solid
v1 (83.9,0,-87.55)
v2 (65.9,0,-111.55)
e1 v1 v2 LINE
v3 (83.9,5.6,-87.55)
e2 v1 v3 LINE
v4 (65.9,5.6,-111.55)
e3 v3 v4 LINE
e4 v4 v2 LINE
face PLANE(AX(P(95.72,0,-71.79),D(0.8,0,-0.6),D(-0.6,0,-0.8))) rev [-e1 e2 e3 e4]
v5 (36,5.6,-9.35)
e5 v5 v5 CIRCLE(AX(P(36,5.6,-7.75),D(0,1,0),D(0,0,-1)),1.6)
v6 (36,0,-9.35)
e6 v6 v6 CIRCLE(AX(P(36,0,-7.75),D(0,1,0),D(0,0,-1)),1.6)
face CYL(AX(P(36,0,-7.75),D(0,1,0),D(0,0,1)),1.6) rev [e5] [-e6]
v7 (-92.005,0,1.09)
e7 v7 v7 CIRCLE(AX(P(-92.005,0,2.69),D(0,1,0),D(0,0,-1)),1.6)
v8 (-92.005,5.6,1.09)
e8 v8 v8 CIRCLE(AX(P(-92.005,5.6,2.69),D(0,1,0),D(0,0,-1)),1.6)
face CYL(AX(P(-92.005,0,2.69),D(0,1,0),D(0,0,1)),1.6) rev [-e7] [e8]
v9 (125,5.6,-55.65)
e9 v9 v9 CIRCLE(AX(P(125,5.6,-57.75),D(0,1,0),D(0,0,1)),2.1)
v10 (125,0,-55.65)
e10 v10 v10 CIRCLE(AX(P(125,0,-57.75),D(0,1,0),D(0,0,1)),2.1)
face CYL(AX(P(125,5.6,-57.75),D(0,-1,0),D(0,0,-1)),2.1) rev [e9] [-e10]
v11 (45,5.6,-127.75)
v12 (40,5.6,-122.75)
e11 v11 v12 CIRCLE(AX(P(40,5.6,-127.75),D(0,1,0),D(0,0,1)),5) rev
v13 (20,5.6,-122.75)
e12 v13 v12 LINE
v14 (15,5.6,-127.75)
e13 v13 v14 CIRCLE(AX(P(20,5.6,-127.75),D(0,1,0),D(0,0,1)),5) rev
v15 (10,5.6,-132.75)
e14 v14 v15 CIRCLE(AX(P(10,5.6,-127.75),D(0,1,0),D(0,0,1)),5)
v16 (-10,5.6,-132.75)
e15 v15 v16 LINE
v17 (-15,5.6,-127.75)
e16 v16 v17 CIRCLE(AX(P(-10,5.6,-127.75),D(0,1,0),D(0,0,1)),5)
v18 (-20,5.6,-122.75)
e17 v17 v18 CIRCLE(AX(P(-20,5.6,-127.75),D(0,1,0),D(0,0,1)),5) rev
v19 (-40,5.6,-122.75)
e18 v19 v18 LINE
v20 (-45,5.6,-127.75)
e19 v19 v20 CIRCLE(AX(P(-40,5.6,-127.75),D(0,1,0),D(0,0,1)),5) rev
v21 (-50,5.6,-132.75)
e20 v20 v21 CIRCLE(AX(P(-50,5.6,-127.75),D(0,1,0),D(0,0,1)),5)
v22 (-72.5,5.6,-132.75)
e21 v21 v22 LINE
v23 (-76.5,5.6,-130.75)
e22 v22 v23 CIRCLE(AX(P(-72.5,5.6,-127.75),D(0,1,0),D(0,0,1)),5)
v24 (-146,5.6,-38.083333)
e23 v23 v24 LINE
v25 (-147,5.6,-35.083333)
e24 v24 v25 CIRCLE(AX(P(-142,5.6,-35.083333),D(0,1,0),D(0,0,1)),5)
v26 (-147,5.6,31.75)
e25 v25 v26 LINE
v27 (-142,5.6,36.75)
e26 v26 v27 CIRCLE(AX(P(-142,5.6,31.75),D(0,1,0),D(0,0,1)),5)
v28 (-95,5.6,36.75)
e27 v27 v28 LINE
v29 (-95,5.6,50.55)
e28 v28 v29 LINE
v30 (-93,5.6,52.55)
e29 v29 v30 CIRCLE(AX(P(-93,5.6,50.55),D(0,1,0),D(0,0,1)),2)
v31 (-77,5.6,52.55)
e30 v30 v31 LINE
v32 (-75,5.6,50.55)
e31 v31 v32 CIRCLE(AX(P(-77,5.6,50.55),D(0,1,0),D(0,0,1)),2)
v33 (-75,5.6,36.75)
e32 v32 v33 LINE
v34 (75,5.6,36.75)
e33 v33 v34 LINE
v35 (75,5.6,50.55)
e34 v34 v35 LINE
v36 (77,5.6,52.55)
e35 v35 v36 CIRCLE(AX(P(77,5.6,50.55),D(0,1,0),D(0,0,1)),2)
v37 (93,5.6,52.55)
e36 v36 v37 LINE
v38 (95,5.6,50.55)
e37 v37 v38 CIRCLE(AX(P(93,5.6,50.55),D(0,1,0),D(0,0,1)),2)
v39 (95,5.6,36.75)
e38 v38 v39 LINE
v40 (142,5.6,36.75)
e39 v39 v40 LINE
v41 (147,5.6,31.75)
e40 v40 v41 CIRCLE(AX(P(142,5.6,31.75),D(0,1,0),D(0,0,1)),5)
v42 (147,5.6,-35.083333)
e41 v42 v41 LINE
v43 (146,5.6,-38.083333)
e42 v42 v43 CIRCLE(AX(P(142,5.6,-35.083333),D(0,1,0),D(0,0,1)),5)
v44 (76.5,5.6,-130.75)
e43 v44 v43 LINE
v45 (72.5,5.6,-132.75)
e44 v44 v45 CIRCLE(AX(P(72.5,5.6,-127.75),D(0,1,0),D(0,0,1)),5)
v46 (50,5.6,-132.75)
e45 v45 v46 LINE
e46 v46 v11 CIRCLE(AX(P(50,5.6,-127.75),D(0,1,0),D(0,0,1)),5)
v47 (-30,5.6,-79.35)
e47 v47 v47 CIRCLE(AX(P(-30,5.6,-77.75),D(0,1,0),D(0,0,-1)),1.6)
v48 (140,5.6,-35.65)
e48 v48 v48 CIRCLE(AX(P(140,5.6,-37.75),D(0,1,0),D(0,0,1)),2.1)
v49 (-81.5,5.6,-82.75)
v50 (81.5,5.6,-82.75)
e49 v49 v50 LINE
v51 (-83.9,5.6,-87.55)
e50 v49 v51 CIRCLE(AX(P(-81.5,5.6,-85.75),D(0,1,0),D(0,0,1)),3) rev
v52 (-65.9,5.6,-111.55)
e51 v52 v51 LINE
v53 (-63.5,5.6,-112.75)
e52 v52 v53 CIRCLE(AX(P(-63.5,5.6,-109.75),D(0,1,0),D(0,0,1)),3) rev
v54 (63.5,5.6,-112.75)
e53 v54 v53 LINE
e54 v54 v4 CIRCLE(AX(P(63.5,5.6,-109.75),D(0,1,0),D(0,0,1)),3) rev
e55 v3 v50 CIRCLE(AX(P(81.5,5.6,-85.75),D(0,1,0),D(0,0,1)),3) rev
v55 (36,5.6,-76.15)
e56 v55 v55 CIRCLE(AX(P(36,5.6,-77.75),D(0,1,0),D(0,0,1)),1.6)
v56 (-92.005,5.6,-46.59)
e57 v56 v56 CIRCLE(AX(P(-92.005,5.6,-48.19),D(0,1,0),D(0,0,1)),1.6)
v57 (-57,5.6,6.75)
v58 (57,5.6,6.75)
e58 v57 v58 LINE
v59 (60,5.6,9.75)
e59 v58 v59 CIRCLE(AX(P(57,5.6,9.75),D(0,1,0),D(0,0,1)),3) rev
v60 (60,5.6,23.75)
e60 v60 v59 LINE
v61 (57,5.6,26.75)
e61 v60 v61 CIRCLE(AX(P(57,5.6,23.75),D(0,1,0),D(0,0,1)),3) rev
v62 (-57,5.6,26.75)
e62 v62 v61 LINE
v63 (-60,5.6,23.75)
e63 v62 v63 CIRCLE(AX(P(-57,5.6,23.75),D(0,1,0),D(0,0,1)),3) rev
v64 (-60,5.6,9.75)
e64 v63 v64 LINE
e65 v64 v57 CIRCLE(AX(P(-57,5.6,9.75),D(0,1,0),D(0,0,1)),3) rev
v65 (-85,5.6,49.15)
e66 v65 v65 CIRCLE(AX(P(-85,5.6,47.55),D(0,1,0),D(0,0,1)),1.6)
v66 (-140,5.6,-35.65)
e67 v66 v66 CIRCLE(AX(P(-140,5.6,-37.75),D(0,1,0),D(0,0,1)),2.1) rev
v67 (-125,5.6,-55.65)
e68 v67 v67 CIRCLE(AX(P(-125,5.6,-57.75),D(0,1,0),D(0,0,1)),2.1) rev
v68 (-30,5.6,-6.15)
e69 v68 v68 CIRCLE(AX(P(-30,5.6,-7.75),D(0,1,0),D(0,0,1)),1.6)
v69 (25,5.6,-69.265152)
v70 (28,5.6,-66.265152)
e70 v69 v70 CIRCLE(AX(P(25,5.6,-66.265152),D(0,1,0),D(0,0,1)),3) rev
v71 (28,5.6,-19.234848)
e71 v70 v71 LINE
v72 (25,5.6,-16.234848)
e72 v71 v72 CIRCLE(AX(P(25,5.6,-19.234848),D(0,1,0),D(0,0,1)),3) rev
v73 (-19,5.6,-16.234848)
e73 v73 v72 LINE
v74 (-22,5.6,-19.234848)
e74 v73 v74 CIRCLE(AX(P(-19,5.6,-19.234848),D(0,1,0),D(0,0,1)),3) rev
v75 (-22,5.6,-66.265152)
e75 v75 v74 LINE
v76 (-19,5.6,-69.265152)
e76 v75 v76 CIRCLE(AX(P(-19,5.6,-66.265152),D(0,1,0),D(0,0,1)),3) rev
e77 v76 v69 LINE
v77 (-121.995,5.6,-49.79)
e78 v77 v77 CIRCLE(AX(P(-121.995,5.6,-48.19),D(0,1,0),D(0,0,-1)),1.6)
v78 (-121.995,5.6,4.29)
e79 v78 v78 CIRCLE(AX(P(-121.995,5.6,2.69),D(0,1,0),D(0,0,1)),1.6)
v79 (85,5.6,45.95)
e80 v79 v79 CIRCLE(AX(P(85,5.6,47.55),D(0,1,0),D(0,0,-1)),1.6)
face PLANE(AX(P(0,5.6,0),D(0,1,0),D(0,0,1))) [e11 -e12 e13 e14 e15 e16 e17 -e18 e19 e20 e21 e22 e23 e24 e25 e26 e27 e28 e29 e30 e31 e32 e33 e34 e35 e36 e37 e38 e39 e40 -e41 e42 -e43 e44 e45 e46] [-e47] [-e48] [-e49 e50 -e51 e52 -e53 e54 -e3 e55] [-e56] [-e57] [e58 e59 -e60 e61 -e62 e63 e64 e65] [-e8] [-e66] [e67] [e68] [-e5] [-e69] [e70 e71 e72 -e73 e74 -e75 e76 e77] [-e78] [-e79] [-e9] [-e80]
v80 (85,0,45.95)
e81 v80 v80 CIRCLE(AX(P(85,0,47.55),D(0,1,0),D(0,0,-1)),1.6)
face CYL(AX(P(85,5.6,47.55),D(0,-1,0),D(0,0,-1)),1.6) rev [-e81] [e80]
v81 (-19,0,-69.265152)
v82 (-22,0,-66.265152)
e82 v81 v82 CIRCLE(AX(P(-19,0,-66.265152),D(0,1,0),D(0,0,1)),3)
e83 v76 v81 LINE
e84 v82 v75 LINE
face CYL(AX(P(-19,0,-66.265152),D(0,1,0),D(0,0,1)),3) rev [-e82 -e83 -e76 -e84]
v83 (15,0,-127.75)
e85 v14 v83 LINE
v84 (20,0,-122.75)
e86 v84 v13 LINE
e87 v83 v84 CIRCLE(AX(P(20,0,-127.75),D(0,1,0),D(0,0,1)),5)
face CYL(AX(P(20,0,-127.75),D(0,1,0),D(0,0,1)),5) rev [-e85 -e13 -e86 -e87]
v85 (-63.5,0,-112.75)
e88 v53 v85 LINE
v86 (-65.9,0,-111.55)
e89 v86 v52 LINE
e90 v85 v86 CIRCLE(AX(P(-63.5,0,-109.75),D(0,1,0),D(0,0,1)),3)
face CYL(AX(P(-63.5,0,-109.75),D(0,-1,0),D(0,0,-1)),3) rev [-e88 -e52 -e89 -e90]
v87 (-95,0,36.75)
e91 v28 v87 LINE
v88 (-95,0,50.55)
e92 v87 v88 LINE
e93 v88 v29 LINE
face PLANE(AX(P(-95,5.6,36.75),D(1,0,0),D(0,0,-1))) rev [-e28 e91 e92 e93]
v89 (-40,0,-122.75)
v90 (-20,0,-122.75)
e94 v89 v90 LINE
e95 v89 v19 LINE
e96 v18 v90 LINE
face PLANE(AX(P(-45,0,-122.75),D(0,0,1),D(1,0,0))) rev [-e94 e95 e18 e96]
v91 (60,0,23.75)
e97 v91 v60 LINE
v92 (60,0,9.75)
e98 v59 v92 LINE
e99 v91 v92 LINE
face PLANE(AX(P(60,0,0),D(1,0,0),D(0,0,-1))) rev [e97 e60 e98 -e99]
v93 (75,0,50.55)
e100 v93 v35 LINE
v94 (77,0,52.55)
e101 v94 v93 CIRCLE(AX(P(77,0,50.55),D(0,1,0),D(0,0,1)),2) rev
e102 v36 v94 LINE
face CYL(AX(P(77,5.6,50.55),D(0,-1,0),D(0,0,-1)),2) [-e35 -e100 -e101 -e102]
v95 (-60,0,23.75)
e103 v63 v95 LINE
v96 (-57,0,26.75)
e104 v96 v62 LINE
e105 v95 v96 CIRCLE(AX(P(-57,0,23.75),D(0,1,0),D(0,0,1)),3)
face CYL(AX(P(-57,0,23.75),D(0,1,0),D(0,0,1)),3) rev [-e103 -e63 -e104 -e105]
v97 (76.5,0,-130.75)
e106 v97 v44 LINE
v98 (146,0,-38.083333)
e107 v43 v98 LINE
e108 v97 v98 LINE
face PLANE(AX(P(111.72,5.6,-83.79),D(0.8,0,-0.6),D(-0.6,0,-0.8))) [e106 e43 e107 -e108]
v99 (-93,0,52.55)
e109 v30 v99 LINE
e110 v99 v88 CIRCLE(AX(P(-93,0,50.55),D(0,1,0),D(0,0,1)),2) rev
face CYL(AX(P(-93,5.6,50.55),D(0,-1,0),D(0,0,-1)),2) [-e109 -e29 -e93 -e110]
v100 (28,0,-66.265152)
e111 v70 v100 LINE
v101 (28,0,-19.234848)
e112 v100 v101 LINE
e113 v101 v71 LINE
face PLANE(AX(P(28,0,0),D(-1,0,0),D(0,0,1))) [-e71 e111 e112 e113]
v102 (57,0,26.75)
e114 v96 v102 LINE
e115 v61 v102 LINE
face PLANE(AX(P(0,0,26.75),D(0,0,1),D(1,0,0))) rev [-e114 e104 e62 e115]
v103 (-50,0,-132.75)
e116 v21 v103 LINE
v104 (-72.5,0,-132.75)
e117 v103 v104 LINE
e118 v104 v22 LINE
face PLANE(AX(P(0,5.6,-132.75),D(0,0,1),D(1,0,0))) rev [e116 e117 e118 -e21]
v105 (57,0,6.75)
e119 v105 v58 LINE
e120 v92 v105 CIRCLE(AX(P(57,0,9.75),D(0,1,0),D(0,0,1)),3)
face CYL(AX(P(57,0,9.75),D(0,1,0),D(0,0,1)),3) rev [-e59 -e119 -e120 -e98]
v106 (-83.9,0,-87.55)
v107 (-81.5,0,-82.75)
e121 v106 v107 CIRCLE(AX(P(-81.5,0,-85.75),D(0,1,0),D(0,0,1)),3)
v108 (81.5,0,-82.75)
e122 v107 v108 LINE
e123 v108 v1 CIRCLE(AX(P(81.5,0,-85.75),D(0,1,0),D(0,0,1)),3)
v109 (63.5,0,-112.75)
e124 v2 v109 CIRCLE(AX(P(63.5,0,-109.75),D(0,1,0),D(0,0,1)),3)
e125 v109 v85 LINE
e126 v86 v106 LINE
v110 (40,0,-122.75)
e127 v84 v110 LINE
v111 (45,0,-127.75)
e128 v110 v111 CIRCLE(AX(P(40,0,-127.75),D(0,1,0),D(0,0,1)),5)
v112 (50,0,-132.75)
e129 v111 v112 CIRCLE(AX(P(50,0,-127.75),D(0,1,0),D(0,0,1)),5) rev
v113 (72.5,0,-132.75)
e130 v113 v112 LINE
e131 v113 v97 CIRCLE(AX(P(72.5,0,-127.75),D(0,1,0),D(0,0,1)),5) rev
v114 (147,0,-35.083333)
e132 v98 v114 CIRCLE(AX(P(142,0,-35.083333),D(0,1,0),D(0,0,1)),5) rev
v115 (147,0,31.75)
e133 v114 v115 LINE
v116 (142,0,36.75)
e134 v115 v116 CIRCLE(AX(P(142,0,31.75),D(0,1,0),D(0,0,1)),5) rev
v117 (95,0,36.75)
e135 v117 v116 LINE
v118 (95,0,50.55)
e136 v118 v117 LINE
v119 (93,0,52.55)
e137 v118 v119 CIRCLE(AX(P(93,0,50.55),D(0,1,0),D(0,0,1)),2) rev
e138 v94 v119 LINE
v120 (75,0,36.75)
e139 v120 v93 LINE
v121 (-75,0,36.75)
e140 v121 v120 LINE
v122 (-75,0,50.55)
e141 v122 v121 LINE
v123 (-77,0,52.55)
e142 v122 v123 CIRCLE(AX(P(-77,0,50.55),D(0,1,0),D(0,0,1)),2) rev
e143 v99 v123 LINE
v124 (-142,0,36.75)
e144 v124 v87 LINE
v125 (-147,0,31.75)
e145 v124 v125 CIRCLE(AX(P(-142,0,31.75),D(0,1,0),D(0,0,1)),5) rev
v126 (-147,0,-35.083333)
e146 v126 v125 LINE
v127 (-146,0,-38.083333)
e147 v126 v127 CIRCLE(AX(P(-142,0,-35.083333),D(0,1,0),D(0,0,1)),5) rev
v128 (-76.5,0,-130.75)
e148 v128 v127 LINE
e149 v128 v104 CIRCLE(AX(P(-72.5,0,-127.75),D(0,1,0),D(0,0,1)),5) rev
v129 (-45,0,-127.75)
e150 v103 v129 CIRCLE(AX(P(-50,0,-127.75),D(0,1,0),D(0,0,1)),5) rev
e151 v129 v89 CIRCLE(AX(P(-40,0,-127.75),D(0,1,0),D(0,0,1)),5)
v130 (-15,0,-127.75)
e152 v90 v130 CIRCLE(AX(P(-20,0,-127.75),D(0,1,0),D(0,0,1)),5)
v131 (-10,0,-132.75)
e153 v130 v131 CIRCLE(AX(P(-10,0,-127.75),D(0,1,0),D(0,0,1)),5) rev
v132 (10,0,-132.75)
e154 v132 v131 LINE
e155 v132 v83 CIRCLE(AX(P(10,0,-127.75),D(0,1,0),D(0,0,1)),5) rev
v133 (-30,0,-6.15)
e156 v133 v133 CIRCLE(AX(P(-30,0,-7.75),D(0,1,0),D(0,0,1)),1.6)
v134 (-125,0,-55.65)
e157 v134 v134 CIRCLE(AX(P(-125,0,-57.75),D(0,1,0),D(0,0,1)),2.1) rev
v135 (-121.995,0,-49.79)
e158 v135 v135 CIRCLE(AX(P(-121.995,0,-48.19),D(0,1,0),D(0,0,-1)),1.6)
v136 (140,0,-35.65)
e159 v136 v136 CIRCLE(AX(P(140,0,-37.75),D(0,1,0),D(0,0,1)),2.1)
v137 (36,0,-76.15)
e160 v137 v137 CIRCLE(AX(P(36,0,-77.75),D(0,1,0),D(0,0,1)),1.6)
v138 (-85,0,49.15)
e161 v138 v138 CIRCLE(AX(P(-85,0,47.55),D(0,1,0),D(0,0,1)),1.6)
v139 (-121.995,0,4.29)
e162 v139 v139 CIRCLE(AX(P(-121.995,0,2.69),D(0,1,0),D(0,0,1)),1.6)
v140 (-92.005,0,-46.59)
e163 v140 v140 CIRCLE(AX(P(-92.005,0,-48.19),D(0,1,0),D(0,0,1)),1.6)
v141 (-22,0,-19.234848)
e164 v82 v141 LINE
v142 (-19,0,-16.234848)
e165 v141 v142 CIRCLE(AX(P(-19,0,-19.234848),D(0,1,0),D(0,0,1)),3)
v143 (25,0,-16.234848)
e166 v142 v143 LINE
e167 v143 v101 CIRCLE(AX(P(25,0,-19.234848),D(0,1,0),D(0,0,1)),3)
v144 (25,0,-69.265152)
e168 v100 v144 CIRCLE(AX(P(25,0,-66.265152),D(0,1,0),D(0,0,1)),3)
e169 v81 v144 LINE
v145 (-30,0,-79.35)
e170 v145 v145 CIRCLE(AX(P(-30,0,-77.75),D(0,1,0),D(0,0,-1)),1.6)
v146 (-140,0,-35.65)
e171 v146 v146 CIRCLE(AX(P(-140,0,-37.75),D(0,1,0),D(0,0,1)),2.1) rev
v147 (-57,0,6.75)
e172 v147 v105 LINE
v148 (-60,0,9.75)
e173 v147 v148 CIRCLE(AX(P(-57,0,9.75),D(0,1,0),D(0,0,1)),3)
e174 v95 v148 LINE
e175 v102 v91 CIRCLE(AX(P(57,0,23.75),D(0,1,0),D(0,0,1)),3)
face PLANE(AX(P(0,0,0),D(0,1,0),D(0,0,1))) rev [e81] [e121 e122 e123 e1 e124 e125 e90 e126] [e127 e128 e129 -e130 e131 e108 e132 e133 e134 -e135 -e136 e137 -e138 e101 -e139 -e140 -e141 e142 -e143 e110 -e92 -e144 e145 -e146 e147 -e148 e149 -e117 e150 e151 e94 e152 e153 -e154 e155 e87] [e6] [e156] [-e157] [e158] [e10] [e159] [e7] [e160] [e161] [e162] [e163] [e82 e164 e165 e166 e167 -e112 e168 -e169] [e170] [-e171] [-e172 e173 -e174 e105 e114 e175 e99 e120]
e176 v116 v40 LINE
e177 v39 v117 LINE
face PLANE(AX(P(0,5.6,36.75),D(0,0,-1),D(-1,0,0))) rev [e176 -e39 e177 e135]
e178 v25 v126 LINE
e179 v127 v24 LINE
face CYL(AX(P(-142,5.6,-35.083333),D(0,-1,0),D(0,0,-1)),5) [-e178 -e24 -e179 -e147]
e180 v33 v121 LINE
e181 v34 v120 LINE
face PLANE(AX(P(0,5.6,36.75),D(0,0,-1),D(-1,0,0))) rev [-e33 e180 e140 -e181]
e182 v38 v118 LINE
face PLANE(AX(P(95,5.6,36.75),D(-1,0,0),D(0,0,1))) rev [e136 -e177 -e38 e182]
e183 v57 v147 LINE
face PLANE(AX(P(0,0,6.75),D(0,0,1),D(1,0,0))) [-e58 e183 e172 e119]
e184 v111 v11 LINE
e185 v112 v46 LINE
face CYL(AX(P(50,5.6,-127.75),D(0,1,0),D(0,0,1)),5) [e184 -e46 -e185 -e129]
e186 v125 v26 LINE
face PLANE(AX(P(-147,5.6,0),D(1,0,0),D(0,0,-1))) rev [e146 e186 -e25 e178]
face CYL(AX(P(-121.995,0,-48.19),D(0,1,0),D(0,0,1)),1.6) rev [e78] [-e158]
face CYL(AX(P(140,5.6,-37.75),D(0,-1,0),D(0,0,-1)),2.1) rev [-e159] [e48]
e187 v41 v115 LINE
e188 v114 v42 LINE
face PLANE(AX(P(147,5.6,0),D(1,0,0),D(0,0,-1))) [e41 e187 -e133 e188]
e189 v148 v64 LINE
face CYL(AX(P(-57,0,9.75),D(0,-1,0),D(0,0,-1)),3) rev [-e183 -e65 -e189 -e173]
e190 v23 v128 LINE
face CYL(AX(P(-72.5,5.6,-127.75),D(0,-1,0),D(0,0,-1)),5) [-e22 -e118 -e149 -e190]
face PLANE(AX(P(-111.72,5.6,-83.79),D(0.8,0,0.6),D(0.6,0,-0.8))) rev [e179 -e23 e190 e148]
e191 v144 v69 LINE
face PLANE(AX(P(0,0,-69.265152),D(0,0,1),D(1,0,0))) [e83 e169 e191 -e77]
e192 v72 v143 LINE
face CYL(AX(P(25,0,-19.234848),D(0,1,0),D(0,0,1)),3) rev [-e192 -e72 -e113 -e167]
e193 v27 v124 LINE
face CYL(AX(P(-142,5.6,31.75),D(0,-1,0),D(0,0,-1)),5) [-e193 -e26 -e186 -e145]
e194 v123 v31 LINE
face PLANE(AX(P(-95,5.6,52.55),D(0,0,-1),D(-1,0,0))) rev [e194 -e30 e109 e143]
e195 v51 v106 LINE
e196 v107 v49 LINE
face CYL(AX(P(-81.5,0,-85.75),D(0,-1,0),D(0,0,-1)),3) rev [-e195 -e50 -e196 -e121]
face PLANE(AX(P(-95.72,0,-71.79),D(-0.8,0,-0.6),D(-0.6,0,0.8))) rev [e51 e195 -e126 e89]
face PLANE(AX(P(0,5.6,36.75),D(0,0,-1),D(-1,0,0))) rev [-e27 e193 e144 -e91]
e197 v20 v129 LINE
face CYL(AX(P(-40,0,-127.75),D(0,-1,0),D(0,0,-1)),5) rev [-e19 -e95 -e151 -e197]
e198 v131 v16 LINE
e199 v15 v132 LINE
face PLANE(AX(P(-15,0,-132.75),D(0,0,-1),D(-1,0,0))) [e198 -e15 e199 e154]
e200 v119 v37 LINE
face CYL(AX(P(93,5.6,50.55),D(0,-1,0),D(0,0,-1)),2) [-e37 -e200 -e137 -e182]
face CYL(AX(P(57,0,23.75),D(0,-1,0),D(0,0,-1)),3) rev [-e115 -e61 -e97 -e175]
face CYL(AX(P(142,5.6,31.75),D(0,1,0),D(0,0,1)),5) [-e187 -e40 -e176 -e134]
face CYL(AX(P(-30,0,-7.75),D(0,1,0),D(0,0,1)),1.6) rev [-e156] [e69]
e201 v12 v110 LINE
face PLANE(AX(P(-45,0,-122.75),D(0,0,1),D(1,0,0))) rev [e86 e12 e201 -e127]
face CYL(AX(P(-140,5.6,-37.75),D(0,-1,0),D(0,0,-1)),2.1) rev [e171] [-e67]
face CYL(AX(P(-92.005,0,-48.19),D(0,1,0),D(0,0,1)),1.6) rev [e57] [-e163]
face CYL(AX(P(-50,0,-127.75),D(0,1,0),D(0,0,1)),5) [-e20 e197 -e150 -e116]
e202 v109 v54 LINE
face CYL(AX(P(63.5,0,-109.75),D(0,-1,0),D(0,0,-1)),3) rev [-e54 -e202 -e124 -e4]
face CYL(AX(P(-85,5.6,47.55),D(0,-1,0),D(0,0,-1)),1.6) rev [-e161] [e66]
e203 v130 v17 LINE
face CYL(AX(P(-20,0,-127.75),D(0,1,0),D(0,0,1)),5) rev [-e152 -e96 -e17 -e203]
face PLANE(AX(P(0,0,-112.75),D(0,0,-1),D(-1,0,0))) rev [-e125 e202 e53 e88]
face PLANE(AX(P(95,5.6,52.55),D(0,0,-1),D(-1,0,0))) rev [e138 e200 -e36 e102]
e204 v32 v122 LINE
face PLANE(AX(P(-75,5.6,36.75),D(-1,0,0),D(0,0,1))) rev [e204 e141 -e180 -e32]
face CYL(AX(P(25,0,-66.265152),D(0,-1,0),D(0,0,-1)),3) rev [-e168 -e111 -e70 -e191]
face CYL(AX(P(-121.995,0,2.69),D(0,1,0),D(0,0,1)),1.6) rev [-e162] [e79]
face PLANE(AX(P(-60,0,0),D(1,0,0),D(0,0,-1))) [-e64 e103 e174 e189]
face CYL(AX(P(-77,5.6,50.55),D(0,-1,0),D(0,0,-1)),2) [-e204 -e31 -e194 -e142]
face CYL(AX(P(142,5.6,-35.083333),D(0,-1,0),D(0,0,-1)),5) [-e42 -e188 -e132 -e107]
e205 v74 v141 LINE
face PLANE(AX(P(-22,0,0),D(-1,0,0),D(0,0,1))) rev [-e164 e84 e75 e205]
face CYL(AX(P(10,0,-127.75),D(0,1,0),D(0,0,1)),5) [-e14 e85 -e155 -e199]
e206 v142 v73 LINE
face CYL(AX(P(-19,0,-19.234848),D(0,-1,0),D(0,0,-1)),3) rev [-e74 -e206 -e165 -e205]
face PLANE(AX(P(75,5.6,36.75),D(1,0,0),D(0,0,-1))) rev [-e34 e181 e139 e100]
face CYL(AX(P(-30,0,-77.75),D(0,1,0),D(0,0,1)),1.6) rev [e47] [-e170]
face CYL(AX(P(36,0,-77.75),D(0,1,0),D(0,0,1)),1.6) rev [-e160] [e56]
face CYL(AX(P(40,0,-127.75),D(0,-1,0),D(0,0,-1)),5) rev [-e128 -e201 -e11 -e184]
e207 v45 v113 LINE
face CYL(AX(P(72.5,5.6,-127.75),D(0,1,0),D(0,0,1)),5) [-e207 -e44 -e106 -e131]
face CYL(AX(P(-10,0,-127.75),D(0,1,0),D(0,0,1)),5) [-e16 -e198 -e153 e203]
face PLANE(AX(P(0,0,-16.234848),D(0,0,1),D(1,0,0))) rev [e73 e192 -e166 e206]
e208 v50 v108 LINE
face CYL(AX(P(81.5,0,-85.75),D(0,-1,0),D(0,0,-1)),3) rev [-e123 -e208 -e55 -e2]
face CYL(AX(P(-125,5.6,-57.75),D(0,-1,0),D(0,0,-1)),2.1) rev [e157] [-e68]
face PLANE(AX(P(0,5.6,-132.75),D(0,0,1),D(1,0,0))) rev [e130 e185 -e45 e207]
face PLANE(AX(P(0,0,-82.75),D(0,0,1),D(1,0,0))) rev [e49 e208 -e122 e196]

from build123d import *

# Parameters (mm, degrees)
SKETCH_1_R          = 2.1
EXTRUDE_1_DEPTH     = 5.6
SKETCH_2_W          = 20
SKETCH_2_H          = 15.8
SKETCH_2_R          = 1.6
EXTRUDE_2_DEPTH     = 5.6
SKETCH_3_R          = 1.6
CUT_EXTRUDE_1_DEPTH = 199.148738326
SKETCH_4_W          = 50
SKETCH_4_H          = 53.03030303
SKETCH_4_W_2        = 120
SKETCH_4_H_2        = 20
CUT_EXTRUDE_2_DEPTH = 199.148738326
SKETCH_6_W          = 90
SKETCH_6_H          = 10
CUT_EXTRUDE_3_DEPTH = 199.148738326
SKETCH_7_W          = 30
SKETCH_7_H          = 10
EXTRUDE_3_DEPTH     = 5.6
FILLET_1_R          = 3
FILLET_2_R          = 5
FILLET_3_R          = 2


with BuildPart() as part:
    # ｽｹｯﾁ1 → ﾎﾞｽ - 押し出し1 (new body)
    with BuildSketch(Plane(origin=(0, 0, 0), x_dir=(1, 0, 0), z_dir=(0, 1, 0))):
        Polygon((-147, 36.75), (-147, -36.75), (147, -36.75), (147, 36.75), (75, 132.75), (-75, 132.75), align=None)
        with Locations(Location((140, 37.75, 0), (0, 0, 270))):
            Circle(SKETCH_1_R, mode=Mode.SUBTRACT)
        with Locations(Location((-140, 37.75, 0), (0, 0, 270))):
            Circle(SKETCH_1_R, mode=Mode.SUBTRACT)
        with Locations(Location((125, 57.75, 0), (0, 0, 270))):
            Circle(SKETCH_1_R, mode=Mode.SUBTRACT)
        with Locations(Location((-125, 57.75, 0), (0, 0, 270))):
            Circle(SKETCH_1_R, mode=Mode.SUBTRACT)
    extrude(amount=EXTRUDE_1_DEPTH)

    # ｽｹｯﾁ2 → ﾎﾞｽ - 押し出し2 (add)
    # profile 1 of 2: a face of its own
    with BuildSketch(Plane(origin=(0, 0, 0), x_dir=(1, 0, 0), z_dir=(0, 1, 0))):
        with Locations((-85, -44.65)):
            Rectangle(SKETCH_2_W, SKETCH_2_H)
        with Locations(Location((-85, -47.55, 0), (0, 0, 270))):
            Circle(SKETCH_2_R, mode=Mode.SUBTRACT)
    # profile 2 of 2: a face of its own
    with BuildSketch(Plane(origin=(0, 0, 0), x_dir=(1, 0, 0), z_dir=(0, 1, 0))):
        with Locations((85, -44.65)):
            Rectangle(SKETCH_2_W, SKETCH_2_H)
        with Locations(Location((85, -47.55, 0), (0, 0, 90))):
            Circle(SKETCH_2_R, mode=Mode.SUBTRACT)
    extrude(amount=EXTRUDE_2_DEPTH)

    # ｽｹｯﾁ3 → ｶｯﾄ - 押し出し1 (cut, through all)
    with BuildSketch(Plane(origin=(0, 5.6, 0), x_dir=(1, 0, 0), z_dir=(0, 1, 0))):
        with Locations(Location((36, 77.75, 0), (0, 0, 270))):
            Circle(SKETCH_3_R)
        with Locations(Location((-30, 77.75, 0), (0, 0, 90))):
            Circle(SKETCH_3_R)
        with Locations(Location((-30, 7.75, 0), (0, 0, 270))):
            Circle(SKETCH_3_R)
        with Locations(Location((36, 7.75, 0), (0, 0, 90))):
            Circle(SKETCH_3_R)
        with Locations(Location((-92.005, 48.19, 0), (0, 0, 270))):
            Circle(SKETCH_3_R)
        with Locations(Location((-92.005, -2.69, 0), (0, 0, 90))):
            Circle(SKETCH_3_R)
        with Locations(Location((-121.995, -2.69, 0), (0, 0, 270))):
            Circle(SKETCH_3_R)
        with Locations(Location((-121.995, 48.19, 0), (0, 0, 90))):
            Circle(SKETCH_3_R)
    extrude(amount=-CUT_EXTRUDE_1_DEPTH, mode=Mode.SUBTRACT)

    # ｽｹｯﾁ4 → ｶｯﾄ - 押し出し2 (cut, through all)
    with BuildSketch(Plane(origin=(0, 5.6, 0), x_dir=(1, 0, 0), z_dir=(0, 1, 0))):
        Polygon((-87.5, 82.75), (87.5, 82.75), (65, 112.75), (-65, 112.75), align=None)
        with Locations((3, 42.75)):
            Rectangle(SKETCH_4_W, SKETCH_4_H)
        with Locations((0, -16.75)):
            Rectangle(SKETCH_4_W_2, SKETCH_4_H_2)
    extrude(amount=-CUT_EXTRUDE_2_DEPTH, mode=Mode.SUBTRACT)

    # ｽｹｯﾁ6 → ｶｯﾄ - 押し出し3 (cut, through all)
    with BuildSketch(Plane(origin=(0, 5.6, 0), x_dir=(1, 0, 0), z_dir=(0, 1, 0))):
        with Locations((0, 127.75)):
            Rectangle(SKETCH_6_W, SKETCH_6_H)
    extrude(amount=-CUT_EXTRUDE_3_DEPTH, mode=Mode.SUBTRACT)

    # ｽｹｯﾁ7 → ﾎﾞｽ - 押し出し3 (add)
    with BuildSketch(Plane(origin=(0, 5.6, 0), x_dir=(1, 0, 0), z_dir=(0, 1, 0))):
        with Locations((0, 127.75)):
            Rectangle(SKETCH_7_W, SKETCH_7_H)
    extrude(amount=-EXTRUDE_3_DEPTH)

    # ﾌｨﾚｯﾄ1
    fillet_1_edges = [part.edges().sort_by_distance(p)[0] for p in [
        (-87.5, 2.8, -82.75),
        (-65, 2.8, -112.75),
        (65, 2.8, -112.75),
        (87.5, 2.8, -82.75),
        (28, 2.8, -69.265151515),
        (28, 2.8, -16.234848485),
        (-22, 2.8, -16.234848485),
        (-22, 2.8, -69.265151515),
        (60, 2.8, 26.75),
        (-60, 2.8, 26.75),
        (-60, 2.8, 6.75),
        (60, 2.8, 6.75),
    ]]
    fillet(fillet_1_edges, radius=FILLET_1_R)

    # ﾌｨﾚｯﾄ2
    fillet_2_edges = [part.edges().sort_by_distance(p)[0] for p in [
        (-147, 2.8, 36.75),
        (-147, 2.8, -36.75),
        (-75, 2.8, -132.75),
        (75, 2.8, -132.75),
        (147, 2.8, -36.75),
        (147, 2.8, 36.75),
        (45, 2.8, -132.75),
        (45, 2.8, -122.75),
        (-45, 2.8, -132.75),
        (-45, 2.8, -122.75),
        (15, 2.8, -132.75),
        (15, 2.8, -122.75),
        (-15, 2.8, -132.75),
        (-15, 2.8, -122.75),
    ]]
    fillet(fillet_2_edges, radius=FILLET_2_R - 0.0001)  # a hair under: the kernel refuses the full size

    # ﾌｨﾚｯﾄ3
    fillet_3_edges = [part.edges().sort_by_distance(p)[0] for p in [
        (-95, 2.8, 52.55),
        (-75, 2.8, 52.55),
        (75, 2.8, 52.55),
        (95, 2.8, 52.55),
    ]]
    fillet(fillet_3_edges, radius=FILLET_3_R)


solid = part.part
